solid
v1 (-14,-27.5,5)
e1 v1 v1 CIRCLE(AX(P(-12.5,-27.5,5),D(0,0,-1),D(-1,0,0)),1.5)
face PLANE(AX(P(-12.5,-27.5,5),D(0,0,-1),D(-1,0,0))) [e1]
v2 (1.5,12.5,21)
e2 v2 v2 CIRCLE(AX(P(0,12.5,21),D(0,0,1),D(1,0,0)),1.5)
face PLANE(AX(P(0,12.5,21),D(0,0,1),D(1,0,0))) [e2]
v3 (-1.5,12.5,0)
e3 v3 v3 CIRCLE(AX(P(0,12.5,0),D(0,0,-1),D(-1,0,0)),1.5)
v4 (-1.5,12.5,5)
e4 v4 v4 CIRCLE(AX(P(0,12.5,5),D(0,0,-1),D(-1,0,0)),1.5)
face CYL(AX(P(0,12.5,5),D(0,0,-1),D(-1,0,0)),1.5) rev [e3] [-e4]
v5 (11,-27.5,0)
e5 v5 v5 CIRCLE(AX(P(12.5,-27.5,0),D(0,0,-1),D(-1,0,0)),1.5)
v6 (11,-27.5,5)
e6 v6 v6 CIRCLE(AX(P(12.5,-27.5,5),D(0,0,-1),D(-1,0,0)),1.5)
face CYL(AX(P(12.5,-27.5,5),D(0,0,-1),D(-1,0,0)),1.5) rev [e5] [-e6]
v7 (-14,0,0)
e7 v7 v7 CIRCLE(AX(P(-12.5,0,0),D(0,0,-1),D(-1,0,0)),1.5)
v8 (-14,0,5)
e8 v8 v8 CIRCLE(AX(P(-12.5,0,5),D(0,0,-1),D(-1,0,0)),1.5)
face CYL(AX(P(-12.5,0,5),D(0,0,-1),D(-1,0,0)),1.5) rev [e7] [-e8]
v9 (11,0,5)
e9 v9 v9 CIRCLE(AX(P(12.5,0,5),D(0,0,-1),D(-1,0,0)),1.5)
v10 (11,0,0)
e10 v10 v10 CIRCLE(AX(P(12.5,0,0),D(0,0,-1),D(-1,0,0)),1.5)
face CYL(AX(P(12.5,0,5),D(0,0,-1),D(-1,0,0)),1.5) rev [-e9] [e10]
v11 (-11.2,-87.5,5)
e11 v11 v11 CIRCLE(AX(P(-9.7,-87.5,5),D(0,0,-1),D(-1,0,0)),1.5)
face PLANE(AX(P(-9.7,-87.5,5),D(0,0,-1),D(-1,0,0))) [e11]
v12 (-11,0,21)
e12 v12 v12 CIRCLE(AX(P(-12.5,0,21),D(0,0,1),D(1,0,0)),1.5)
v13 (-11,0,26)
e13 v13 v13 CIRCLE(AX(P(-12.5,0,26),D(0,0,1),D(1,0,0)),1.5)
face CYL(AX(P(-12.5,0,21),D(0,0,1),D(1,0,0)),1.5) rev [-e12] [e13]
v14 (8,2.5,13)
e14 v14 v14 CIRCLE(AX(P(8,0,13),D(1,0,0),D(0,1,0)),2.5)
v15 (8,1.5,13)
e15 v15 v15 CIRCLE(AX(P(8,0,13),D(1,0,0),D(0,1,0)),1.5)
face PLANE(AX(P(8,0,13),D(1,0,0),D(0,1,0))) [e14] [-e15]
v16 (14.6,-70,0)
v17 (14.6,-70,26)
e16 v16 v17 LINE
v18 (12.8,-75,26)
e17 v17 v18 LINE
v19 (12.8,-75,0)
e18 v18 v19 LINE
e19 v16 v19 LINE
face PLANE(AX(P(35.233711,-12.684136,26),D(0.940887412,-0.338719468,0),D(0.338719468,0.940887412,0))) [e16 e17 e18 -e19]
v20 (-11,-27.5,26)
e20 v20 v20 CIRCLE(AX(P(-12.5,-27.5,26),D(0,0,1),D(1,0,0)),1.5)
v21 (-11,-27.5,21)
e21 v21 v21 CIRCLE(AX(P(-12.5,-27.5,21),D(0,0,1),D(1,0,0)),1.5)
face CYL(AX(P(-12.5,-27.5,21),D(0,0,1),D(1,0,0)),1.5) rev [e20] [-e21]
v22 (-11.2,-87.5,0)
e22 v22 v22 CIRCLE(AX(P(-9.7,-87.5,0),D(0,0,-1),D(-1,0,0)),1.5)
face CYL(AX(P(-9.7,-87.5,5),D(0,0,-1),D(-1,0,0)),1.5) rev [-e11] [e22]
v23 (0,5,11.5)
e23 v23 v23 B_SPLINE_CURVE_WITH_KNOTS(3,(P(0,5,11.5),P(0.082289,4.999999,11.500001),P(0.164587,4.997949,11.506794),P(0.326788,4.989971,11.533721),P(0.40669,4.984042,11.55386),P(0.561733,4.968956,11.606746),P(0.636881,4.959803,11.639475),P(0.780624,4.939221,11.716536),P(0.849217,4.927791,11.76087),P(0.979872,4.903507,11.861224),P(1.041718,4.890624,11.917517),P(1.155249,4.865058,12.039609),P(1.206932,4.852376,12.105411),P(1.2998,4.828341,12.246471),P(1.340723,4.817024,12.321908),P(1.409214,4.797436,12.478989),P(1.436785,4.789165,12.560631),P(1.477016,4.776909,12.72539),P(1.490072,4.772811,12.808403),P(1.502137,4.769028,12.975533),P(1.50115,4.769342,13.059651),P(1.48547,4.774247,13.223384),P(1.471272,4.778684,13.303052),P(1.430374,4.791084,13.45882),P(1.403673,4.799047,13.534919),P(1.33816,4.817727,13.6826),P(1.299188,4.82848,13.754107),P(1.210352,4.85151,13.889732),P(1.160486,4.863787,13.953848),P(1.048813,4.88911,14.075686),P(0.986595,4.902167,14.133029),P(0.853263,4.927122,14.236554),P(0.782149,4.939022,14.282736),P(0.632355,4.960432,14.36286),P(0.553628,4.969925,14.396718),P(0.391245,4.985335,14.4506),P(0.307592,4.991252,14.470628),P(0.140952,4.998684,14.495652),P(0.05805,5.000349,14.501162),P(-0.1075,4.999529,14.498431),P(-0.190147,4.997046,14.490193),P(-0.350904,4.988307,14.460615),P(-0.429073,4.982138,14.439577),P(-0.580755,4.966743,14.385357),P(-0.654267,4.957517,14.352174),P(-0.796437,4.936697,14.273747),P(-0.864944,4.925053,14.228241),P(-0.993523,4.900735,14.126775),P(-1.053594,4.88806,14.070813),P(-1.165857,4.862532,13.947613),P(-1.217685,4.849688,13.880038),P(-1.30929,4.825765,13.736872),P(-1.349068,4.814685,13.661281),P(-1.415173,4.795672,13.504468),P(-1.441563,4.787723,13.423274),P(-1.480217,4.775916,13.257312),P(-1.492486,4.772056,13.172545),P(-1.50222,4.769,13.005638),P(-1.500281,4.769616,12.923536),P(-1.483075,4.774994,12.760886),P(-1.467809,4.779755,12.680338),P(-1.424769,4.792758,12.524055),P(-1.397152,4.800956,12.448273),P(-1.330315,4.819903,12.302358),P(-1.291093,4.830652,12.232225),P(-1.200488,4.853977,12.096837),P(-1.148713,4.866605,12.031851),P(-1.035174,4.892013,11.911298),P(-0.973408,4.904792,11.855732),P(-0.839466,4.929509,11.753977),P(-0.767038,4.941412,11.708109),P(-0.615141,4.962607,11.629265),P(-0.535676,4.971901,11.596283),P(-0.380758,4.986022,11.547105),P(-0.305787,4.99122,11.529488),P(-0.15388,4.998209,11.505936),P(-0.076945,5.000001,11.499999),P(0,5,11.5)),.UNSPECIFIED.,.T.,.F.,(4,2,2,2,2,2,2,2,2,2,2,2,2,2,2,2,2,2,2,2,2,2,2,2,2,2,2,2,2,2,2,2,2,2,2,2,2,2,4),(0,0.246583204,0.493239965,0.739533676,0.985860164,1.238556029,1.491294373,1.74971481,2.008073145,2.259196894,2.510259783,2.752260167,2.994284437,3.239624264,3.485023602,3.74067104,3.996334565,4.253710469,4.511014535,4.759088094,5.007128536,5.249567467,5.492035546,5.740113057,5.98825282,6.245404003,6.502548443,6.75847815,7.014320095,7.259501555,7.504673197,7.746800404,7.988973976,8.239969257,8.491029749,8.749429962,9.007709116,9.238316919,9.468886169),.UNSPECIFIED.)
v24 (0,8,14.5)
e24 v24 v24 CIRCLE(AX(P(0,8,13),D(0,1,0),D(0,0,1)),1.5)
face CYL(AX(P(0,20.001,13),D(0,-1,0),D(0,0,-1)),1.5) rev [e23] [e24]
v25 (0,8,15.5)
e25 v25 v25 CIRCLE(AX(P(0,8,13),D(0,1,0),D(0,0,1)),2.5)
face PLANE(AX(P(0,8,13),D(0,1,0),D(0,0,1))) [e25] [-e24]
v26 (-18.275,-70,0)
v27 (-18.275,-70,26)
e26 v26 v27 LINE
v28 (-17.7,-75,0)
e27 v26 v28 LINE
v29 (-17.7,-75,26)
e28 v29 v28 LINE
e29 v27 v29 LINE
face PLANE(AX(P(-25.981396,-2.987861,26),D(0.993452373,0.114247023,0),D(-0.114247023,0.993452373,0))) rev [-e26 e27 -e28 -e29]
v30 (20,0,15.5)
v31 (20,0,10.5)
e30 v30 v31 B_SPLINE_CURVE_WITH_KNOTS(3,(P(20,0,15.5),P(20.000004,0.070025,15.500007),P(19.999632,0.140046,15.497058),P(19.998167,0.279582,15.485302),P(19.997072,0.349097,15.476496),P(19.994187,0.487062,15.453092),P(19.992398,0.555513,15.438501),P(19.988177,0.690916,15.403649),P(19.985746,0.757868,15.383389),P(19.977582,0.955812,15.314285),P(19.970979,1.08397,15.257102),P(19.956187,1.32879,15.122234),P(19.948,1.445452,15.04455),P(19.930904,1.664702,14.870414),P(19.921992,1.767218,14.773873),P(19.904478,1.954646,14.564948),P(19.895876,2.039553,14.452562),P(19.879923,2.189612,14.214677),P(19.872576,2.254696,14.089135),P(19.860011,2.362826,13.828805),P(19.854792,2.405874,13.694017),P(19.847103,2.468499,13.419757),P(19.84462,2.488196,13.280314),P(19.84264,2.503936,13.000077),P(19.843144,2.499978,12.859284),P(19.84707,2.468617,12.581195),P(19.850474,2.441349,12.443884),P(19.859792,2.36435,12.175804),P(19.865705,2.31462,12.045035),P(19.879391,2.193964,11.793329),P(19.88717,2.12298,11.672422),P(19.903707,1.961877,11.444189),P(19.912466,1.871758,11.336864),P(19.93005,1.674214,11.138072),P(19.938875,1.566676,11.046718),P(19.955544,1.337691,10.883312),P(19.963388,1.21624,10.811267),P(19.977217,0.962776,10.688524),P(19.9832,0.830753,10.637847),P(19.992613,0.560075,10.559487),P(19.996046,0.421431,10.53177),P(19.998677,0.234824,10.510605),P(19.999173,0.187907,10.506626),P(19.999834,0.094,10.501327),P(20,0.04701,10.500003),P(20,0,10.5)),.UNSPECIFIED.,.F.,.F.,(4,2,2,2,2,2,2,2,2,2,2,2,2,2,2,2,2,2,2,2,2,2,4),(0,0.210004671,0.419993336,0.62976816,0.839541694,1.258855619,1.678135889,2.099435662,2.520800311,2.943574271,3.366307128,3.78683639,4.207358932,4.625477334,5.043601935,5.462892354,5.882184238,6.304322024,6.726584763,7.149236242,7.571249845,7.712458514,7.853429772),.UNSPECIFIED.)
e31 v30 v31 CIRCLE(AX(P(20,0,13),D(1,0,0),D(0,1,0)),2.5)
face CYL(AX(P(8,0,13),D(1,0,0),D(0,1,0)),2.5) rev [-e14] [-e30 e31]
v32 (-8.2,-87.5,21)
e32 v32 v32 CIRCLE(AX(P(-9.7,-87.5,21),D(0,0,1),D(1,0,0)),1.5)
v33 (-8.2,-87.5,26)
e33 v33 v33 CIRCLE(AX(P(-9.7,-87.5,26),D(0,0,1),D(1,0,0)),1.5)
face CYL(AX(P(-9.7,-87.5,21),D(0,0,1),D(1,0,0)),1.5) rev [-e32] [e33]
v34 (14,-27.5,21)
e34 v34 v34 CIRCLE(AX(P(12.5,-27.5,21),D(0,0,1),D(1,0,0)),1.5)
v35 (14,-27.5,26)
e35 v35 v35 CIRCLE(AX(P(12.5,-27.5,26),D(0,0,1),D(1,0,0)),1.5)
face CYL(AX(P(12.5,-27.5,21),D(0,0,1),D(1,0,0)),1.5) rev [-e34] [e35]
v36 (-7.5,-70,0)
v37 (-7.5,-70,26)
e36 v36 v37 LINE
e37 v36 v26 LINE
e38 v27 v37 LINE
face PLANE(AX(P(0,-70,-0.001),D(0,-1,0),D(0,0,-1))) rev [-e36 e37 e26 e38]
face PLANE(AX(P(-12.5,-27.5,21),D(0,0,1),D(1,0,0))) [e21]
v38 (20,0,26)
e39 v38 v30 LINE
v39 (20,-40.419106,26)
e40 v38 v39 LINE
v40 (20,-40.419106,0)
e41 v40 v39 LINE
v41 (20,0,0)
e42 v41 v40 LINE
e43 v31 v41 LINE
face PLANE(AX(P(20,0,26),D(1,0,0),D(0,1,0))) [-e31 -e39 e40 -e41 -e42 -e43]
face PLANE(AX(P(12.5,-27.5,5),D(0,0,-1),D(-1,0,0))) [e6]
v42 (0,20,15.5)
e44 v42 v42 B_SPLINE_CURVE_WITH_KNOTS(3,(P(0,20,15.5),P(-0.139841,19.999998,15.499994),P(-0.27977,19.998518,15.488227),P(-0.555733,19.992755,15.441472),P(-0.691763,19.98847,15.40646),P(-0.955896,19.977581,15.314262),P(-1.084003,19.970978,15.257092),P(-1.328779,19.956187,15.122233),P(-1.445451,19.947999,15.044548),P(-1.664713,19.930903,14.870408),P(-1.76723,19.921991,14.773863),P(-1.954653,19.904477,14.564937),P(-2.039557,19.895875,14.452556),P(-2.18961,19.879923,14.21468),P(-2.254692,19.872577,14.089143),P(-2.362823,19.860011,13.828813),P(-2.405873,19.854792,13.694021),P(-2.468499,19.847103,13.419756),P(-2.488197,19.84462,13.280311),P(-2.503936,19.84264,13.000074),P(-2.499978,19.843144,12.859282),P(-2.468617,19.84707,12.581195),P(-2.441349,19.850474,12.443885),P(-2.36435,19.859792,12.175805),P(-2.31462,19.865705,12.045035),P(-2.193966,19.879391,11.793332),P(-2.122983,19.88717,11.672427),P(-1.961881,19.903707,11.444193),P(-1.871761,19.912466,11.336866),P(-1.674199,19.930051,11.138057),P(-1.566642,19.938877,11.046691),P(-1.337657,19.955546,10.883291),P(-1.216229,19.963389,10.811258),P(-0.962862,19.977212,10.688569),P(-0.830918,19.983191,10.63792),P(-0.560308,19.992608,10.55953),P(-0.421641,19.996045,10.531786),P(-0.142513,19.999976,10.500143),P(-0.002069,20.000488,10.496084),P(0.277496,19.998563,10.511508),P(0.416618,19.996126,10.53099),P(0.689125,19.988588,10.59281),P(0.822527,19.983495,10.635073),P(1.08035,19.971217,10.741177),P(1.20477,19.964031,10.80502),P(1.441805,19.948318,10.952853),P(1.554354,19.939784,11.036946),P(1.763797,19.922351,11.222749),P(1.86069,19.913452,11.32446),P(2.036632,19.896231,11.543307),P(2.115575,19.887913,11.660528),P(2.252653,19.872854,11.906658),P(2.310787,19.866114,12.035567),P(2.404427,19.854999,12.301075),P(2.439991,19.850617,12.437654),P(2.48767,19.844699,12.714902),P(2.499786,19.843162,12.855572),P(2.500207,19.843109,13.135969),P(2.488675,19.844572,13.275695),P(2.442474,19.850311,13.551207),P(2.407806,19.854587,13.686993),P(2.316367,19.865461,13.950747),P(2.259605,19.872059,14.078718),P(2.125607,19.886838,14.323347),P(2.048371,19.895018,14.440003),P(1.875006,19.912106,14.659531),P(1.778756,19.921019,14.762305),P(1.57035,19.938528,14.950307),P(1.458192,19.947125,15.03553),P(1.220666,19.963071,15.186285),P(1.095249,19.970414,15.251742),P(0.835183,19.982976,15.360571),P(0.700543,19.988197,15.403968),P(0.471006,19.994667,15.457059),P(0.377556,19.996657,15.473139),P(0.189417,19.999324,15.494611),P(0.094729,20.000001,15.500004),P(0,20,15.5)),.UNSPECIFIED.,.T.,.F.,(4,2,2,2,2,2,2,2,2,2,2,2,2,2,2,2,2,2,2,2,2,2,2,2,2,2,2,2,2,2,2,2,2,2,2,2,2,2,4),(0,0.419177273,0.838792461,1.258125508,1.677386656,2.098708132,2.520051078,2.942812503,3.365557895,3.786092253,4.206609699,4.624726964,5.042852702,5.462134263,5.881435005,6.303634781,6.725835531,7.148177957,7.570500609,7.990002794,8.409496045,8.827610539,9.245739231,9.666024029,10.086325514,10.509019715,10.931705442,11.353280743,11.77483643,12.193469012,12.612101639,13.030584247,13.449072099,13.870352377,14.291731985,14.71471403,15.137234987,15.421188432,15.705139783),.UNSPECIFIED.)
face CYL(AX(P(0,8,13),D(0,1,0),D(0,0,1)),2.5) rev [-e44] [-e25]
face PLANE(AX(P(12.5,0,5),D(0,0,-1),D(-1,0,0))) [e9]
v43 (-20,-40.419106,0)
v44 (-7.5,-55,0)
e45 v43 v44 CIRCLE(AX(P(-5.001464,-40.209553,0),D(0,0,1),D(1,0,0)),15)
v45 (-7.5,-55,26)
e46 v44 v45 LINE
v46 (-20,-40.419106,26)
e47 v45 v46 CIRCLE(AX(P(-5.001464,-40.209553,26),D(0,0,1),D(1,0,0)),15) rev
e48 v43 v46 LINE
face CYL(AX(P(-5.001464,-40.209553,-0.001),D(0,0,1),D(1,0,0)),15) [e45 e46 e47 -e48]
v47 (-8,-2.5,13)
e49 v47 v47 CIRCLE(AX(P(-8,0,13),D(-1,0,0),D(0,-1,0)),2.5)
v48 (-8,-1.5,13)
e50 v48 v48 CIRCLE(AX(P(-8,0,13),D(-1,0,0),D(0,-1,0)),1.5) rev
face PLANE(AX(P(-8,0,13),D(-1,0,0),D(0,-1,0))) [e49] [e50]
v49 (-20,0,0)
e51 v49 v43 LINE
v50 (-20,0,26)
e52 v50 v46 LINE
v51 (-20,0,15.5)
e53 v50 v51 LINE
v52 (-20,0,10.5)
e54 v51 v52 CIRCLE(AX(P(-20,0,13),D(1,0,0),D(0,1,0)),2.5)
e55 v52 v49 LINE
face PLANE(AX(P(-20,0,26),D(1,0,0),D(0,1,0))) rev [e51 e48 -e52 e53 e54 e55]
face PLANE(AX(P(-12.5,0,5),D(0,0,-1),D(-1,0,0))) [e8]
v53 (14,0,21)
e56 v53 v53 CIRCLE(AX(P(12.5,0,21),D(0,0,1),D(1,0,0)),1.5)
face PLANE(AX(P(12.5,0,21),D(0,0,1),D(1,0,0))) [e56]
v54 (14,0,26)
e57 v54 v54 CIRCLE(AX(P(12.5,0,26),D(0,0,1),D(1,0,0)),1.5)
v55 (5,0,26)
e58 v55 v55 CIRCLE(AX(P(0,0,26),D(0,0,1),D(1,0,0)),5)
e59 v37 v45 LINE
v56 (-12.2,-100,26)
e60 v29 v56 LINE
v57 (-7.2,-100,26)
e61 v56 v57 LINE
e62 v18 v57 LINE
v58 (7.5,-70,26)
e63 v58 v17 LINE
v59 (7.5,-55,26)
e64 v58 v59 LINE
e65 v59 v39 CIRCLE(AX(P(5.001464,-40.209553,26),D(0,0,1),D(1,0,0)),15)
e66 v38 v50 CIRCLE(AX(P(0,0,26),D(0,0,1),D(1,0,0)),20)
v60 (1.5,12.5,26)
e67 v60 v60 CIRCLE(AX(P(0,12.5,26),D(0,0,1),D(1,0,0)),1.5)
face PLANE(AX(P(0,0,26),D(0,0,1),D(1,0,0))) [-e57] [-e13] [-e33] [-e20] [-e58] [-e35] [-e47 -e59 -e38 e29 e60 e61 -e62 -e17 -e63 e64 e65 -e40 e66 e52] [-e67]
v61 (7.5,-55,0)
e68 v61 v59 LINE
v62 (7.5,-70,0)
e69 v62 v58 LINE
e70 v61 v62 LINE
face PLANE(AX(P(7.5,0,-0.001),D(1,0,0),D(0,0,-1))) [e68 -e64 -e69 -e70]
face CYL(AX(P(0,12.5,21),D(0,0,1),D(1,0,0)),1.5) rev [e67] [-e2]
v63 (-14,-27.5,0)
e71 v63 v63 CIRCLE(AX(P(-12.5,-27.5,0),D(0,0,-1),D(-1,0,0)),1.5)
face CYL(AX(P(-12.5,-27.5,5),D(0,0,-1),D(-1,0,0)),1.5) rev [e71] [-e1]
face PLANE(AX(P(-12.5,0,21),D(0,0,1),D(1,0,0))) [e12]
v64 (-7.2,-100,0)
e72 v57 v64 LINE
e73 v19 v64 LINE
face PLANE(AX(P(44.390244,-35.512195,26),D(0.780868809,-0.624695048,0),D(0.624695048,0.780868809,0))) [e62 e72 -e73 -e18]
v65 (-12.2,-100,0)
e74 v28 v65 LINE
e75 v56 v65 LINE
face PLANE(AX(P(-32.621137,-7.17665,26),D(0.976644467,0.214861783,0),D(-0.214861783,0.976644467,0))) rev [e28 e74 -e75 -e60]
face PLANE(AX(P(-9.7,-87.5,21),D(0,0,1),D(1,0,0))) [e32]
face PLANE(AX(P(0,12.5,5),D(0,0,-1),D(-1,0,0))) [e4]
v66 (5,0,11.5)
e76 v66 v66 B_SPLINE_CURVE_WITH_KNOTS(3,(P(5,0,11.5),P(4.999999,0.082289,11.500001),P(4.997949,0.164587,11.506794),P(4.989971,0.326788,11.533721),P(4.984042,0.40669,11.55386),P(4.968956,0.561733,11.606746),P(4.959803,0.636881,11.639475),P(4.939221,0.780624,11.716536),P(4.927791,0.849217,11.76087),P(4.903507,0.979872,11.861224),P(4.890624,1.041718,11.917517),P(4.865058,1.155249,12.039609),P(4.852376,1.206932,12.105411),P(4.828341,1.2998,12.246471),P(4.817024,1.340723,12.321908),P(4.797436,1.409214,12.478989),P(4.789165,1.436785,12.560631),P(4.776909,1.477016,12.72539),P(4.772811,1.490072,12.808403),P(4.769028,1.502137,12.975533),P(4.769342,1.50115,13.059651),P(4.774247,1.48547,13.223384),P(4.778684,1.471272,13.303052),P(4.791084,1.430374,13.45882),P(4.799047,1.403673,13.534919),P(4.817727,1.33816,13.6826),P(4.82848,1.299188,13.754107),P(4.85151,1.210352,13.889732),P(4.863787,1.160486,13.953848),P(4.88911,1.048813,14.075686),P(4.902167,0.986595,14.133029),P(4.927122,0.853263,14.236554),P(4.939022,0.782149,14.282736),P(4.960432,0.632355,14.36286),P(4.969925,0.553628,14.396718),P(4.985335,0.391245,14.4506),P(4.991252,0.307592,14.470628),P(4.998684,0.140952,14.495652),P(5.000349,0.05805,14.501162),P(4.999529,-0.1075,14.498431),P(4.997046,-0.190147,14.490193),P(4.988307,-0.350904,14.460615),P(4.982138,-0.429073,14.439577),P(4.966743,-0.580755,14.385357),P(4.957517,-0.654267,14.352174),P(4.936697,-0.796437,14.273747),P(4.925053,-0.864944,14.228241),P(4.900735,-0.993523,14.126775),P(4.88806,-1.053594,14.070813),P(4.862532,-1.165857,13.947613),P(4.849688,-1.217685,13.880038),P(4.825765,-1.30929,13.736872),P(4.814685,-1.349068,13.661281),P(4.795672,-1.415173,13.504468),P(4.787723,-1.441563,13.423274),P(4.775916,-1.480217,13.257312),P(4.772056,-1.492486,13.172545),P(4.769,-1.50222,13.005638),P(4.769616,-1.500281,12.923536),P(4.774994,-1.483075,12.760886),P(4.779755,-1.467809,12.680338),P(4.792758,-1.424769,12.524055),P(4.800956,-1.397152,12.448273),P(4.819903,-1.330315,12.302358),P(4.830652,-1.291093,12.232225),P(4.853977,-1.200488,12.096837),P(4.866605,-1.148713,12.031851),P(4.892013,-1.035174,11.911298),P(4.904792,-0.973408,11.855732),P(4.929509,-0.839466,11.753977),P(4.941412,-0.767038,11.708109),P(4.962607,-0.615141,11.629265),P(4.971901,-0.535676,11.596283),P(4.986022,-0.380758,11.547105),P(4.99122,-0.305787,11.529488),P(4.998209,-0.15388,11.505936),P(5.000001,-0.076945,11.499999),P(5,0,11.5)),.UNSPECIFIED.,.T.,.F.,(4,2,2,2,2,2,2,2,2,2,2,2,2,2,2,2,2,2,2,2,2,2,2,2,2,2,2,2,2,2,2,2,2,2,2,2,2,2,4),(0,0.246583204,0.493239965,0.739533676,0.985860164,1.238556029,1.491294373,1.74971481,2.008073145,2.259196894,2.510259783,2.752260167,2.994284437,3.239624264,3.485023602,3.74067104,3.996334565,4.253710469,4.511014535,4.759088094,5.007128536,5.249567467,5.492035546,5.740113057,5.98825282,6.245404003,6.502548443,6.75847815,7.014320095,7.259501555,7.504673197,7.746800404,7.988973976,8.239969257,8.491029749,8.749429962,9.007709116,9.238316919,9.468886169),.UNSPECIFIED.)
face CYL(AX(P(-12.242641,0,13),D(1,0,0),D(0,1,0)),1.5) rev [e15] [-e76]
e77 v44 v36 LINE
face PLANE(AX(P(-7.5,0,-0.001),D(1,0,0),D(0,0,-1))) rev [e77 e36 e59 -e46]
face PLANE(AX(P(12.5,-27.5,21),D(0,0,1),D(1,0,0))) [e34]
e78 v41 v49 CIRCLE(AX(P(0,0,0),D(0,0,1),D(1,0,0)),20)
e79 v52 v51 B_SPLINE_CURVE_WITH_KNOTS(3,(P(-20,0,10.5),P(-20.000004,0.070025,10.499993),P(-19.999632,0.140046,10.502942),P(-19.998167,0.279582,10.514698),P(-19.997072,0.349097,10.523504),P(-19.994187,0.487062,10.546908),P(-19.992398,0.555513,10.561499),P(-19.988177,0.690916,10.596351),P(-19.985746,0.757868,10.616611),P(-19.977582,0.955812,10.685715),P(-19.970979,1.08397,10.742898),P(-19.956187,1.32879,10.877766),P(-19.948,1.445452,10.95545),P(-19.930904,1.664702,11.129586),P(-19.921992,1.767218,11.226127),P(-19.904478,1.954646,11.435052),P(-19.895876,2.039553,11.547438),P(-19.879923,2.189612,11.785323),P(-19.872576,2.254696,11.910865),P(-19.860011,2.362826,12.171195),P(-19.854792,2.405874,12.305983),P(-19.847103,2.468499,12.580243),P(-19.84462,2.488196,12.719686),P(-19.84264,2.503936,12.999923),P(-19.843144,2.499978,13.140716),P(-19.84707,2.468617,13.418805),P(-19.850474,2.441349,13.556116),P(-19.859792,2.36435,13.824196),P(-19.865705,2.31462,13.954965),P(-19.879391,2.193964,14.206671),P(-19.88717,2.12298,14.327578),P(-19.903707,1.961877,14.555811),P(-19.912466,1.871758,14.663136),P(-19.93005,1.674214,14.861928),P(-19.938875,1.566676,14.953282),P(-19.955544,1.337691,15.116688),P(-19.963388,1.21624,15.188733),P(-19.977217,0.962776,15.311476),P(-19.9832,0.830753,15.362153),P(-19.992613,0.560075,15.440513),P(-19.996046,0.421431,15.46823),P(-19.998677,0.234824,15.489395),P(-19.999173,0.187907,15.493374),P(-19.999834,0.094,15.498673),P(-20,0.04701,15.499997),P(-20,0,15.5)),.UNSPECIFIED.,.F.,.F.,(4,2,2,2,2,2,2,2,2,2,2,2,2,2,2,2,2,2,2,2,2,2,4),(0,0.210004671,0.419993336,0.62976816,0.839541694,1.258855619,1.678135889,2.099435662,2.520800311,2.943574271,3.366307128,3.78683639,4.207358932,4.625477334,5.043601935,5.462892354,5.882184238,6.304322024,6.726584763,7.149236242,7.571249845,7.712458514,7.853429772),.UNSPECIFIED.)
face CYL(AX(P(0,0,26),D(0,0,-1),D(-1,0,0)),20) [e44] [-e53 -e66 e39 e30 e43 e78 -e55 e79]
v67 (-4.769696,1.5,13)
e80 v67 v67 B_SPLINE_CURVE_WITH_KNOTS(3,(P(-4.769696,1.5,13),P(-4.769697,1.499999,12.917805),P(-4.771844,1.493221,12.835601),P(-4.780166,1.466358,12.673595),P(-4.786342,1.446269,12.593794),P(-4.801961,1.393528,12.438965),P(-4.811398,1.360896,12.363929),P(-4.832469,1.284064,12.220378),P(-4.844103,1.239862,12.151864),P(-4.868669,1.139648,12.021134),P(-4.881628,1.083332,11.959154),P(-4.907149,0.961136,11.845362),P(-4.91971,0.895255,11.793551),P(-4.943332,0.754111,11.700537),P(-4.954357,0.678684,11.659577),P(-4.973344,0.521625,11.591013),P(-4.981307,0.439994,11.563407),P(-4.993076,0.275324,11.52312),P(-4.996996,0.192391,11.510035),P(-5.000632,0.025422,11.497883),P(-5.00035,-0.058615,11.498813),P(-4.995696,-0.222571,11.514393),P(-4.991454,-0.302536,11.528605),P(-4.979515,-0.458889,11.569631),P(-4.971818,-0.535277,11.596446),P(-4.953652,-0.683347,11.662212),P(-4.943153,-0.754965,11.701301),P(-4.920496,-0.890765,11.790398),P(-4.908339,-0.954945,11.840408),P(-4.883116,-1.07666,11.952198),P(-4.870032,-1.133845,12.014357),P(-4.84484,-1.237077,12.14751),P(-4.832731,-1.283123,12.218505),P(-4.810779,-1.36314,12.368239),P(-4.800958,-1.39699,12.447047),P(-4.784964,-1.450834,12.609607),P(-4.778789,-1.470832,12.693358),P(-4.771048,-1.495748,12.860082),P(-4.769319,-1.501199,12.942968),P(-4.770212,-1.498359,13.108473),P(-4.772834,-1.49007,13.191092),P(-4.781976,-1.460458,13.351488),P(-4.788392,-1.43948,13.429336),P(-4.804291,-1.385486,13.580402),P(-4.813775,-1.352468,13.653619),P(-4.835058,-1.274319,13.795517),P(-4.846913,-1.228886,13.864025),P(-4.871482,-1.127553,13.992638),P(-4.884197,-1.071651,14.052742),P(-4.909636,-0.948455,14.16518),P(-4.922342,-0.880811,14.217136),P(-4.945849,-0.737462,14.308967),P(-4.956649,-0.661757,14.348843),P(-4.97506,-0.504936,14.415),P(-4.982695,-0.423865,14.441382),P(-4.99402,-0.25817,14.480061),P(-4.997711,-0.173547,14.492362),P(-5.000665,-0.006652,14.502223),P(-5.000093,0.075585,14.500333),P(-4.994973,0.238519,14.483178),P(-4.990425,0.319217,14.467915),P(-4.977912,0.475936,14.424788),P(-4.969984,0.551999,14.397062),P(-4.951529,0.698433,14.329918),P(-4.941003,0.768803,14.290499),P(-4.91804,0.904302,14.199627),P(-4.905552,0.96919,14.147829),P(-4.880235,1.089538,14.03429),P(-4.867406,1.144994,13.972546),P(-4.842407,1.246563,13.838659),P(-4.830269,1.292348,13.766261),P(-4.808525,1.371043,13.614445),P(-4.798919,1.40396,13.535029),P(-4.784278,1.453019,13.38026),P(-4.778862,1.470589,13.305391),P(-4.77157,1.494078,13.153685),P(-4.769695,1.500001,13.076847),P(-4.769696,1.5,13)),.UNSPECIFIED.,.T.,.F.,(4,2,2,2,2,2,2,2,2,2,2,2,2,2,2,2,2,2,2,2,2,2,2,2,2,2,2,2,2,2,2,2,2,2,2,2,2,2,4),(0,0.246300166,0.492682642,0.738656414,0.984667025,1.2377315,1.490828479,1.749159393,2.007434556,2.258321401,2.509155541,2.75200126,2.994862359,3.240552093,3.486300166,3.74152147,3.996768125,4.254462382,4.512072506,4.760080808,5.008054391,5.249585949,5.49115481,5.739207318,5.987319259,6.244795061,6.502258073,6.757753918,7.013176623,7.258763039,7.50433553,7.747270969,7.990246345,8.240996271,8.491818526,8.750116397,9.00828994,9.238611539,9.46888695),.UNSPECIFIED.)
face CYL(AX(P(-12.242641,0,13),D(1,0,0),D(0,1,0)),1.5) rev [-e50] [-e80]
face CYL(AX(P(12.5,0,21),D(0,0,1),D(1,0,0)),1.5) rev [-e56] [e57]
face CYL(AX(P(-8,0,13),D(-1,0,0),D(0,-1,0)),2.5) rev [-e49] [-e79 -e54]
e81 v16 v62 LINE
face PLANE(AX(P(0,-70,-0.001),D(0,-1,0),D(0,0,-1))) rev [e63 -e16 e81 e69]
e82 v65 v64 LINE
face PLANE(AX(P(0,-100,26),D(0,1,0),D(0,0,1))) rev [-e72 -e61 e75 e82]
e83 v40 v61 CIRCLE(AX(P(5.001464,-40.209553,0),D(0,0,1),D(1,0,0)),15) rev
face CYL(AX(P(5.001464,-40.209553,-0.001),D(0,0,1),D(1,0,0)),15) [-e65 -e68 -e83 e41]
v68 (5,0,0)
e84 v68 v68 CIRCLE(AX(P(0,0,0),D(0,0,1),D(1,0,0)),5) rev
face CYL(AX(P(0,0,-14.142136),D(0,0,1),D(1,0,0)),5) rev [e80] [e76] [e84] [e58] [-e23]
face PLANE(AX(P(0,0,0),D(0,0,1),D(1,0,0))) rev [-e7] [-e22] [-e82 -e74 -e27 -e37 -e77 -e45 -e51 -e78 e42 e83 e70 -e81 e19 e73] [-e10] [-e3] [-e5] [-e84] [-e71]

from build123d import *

# Parameters (mm, degrees)
EXTRUDE_1_DEPTH          = 26
SKETCH_2_R               = 5
CUT_EXTRUDE_1_DEPTH      = 26
SKETCH_5_R               = 2.5
CUT_EXTRUDE_3_DEPTH      = 12
CUT_EXTRUDE_START        = -12
SKETCH_6_R               = 2.5
CUT_EXTRUDE_4_DEPTH      = 12
CUT_EXTRUDE_5_REACH      = 109.051
SKETCH_7_R               = 1.5
CUT_EXTRUDE_6_REACH      = 107.243
CUT_EXTRUDE_6_END_RADIUS = 20
SKETCH_8_R               = 1.5
SKETCH_10_R              = 2.5
CUT_EXTRUDE_7_DEPTH      = 12
CUT_EXTRUDE_8_REACH      = 107.243
CUT_EXTRUDE_START_2      = -26
CUT_EXTRUDE_9_DEPTH      = 26
SKETCH_13_R              = 1.5
CUT_EXTRUDE_10_DEPTH     = 5
CUT_EXTRUDE_START_3      = -5
SKETCH_14_R              = 1.5
CUT_EXTRUDE_11_DEPTH     = 5


# Read off the part's stored shape, not the designer's step: 切除-拉伸9
with BuildPart() as part:
    # 草图1 → 凸台-拉伸1 (new body)
    with BuildSketch(Plane.XY):
        with BuildLine():
            ThreePointArc((20, 0), (0, 20), (-20, 0))
            Line((-20, 0), (20, 0))
        make_face()
        with BuildLine():
            Line((20, 0), (-20, 0))
            ThreePointArc((-20, 0), (0, -20), (20, 0))
        make_face()
        with BuildLine():
            ThreePointArc((20, 0), (0, -20), (-20, 0))
            Line((-20, 0), (-20, -55))
            Line((-20, -55), (20, -55))
            Line((20, -55), (20, 0))
        make_face()
        Polygon((20, -55), (-20, -55), (-17.7, -75), (-12.2, -100), (-7.2, -100), (12.8, -75), align=None)
    extrude(amount=EXTRUDE_1_DEPTH)

    # 草图2 → 切除-拉伸1 (cut)
    with BuildSketch(Plane.XY.offset(26)):
        Circle(SKETCH_2_R)
    extrude(amount=-CUT_EXTRUDE_1_DEPTH, mode=Mode.SUBTRACT)

    # 草图5 → 切除-拉伸3 (cut)
    with BuildSketch(Plane.ZY.offset(20)):
        with Locations(Location((13, 0, 0), (0, 0, 270))):
            Circle(SKETCH_5_R)
    extrude(amount=-CUT_EXTRUDE_3_DEPTH, mode=Mode.SUBTRACT)

    # 草图6 → 切除-拉伸4 (cut)
    with BuildSketch(Plane(origin=(20, 0, 0), x_dir=(0, 0, -1), z_dir=(1, 0, 0)).offset(CUT_EXTRUDE_START)):
        with Locations(Location((-13, 0, 0), (0, 0, 270))):
            Circle(SKETCH_6_R)
    extrude(amount=CUT_EXTRUDE_4_DEPTH, mode=Mode.SUBTRACT)

    # 切除-拉伸5: up to this face of the body (flat: up to its plane)
    cut_extrude_5_end = Plane(part.part.faces().sort_by_distance((-8, 0, 13))[0])
    # 草图7 → 切除-拉伸5 (cut, up to the picked face)
    with BuildSketch(Plane(origin=(8, 0, 0), x_dir=(0, 0, -1), z_dir=(1, 0, 0)), mode=Mode.PRIVATE) as cut_extrude_5_sk1:
        with Locations(Location((-13, 0, 0), (0, 0, 90))):
            Circle(SKETCH_7_R)
    cut_extrude_5_tool1 = split(extrude(cut_extrude_5_sk1.sketch, amount=-CUT_EXTRUDE_5_REACH, mode=Mode.PRIVATE), bisect_by=cut_extrude_5_end, keep=Keep.BOTH, mode=Mode.PRIVATE)
    add(cut_extrude_5_tool1.solids().sort_by(Axis((8, 0, 13), (-1, 0, 0)))[0], mode=Mode.SUBTRACT)

    # 切除-拉伸6: up to this cylinder (the profile starts inside it)
    cut_extrude_6_end = Plane(origin=(0, 0, 13), z_dir=(0, 0, -1)) * Cylinder(CUT_EXTRUDE_6_END_RADIUS, 255.486, mode=Mode.PRIVATE)
    # 草图8 → 切除-拉伸6 (cut, up to the surface)
    with BuildSketch(Plane(origin=(0, 0, 0), x_dir=(1, 0, 0), z_dir=(0, 1, 0)), mode=Mode.PRIVATE) as cut_extrude_6_sk1:
        with Locations(Location((0, -13, 0), (0, 0, 90))):
            Circle(SKETCH_8_R)
    cut_extrude_6_tool1 = extrude(cut_extrude_6_sk1.sketch, amount=CUT_EXTRUDE_6_REACH, mode=Mode.PRIVATE) & cut_extrude_6_end
    add(cut_extrude_6_tool1.solids().sort_by_distance((0, 0, 13))[0], mode=Mode.SUBTRACT)

    # 草图10 → 切除-拉伸7 (cut)
    with BuildSketch(Plane(origin=(0, 20, 0), x_dir=(1, 0, 0), z_dir=(0, 1, 0))):
        with Locations(Location((0, -13, 0), (0, 0, 270))):
            Circle(SKETCH_10_R)
    extrude(amount=-CUT_EXTRUDE_7_DEPTH, mode=Mode.SUBTRACT)

    # 草图11 → 切除-拉伸8 (cut, up to next)
    with BuildSketch(Plane.XY.offset(26), mode=Mode.PRIVATE) as cut_extrude_8_sk1:
        Polygon((-7.5, -55), (-20, -55), (-18.275, -70), (-7.5, -70), align=None)
    cut_extrude_8_tool1 = extrude(cut_extrude_8_sk1.sketch, amount=-CUT_EXTRUDE_8_REACH, mode=Mode.PRIVATE) & part.part
    # 草图11 → 切除-拉伸8 (cut, up to next)
    with BuildSketch(Plane.XY.offset(26), mode=Mode.PRIVATE) as cut_extrude_8_sk2:
        Polygon((20, -55), (7.5, -55), (7.5, -70), (14.6, -70), align=None)
    cut_extrude_8_tool2 = extrude(cut_extrude_8_sk2.sketch, amount=-CUT_EXTRUDE_8_REACH, mode=Mode.PRIVATE) & part.part
    add(cut_extrude_8_tool1.solids().sort_by_distance((-13.329404, -62.314715, 26))[0], mode=Mode.SUBTRACT)
    add(cut_extrude_8_tool2.solids().sort_by_distance((12.52398, -61.811224, 26))[0], mode=Mode.SUBTRACT)

    # 切除-拉伸9 outline → 切除-拉伸9 (cut)
    with BuildSketch(Plane.XY.offset(26).offset(CUT_EXTRUDE_START_2)):
        with BuildLine():
            ThreePointArc((-7.5, -55), (-16.389505797, -49.97236528), (-20, -40.419106371))
            Line((-20, -40.419106371), (-20, -55))
            Line((-20, -55), (-7.5, -55))
        make_face()
        with BuildLine():
            ThreePointArc((20, -40.419106371), (16.389505797, -49.97236528), (7.5, -55))
            Line((7.5, -55), (20, -55))
            Line((20, -55), (20, -40.419106371))
        make_face()
    extrude(amount=CUT_EXTRUDE_9_DEPTH, mode=Mode.SUBTRACT)

    # 草图13 → 切除-拉伸10 (cut)
    with BuildSketch(Plane.XY.offset(26)):
        with Locations((-12.5, -27.5)):
            Circle(SKETCH_13_R)
        with Locations((12.5, -27.5)):
            Circle(SKETCH_13_R)
        with Locations((12.5, 0)):
            Circle(SKETCH_13_R)
        with Locations((0, 12.5)):
            Circle(SKETCH_13_R)
        with Locations((-12.5, 0)):
            Circle(SKETCH_13_R)
        with Locations((-9.7, -87.5)):
            Circle(SKETCH_13_R)
    extrude(amount=-CUT_EXTRUDE_10_DEPTH, mode=Mode.SUBTRACT)

    # 草图14 → 切除-拉伸11 (cut)
    with BuildSketch(Plane(origin=(0, 0, 0), x_dir=(-1, 0, 0), z_dir=(0, 0, -1)).offset(CUT_EXTRUDE_START_3)):
        with Locations(Location((12.5, 0, 0), (0, 0, 180))):
            Circle(SKETCH_14_R)
        with Locations(Location((0, 12.5, 0), (0, 0, 180))):
            Circle(SKETCH_14_R)
        with Locations(Location((-12.5, 0, 0), (0, 0, 180))):
            Circle(SKETCH_14_R)
        with Locations(Location((-12.5, -27.5, 0), (0, 0, 180))):
            Circle(SKETCH_14_R)
        with Locations(Location((12.5, -27.5, 0), (0, 0, 180))):
            Circle(SKETCH_14_R)
        with Locations(Location((9.7, -87.5, 0), (0, 0, 180))):
            Circle(SKETCH_14_R)
    extrude(amount=CUT_EXTRUDE_11_DEPTH, mode=Mode.SUBTRACT)


solid = part.part
